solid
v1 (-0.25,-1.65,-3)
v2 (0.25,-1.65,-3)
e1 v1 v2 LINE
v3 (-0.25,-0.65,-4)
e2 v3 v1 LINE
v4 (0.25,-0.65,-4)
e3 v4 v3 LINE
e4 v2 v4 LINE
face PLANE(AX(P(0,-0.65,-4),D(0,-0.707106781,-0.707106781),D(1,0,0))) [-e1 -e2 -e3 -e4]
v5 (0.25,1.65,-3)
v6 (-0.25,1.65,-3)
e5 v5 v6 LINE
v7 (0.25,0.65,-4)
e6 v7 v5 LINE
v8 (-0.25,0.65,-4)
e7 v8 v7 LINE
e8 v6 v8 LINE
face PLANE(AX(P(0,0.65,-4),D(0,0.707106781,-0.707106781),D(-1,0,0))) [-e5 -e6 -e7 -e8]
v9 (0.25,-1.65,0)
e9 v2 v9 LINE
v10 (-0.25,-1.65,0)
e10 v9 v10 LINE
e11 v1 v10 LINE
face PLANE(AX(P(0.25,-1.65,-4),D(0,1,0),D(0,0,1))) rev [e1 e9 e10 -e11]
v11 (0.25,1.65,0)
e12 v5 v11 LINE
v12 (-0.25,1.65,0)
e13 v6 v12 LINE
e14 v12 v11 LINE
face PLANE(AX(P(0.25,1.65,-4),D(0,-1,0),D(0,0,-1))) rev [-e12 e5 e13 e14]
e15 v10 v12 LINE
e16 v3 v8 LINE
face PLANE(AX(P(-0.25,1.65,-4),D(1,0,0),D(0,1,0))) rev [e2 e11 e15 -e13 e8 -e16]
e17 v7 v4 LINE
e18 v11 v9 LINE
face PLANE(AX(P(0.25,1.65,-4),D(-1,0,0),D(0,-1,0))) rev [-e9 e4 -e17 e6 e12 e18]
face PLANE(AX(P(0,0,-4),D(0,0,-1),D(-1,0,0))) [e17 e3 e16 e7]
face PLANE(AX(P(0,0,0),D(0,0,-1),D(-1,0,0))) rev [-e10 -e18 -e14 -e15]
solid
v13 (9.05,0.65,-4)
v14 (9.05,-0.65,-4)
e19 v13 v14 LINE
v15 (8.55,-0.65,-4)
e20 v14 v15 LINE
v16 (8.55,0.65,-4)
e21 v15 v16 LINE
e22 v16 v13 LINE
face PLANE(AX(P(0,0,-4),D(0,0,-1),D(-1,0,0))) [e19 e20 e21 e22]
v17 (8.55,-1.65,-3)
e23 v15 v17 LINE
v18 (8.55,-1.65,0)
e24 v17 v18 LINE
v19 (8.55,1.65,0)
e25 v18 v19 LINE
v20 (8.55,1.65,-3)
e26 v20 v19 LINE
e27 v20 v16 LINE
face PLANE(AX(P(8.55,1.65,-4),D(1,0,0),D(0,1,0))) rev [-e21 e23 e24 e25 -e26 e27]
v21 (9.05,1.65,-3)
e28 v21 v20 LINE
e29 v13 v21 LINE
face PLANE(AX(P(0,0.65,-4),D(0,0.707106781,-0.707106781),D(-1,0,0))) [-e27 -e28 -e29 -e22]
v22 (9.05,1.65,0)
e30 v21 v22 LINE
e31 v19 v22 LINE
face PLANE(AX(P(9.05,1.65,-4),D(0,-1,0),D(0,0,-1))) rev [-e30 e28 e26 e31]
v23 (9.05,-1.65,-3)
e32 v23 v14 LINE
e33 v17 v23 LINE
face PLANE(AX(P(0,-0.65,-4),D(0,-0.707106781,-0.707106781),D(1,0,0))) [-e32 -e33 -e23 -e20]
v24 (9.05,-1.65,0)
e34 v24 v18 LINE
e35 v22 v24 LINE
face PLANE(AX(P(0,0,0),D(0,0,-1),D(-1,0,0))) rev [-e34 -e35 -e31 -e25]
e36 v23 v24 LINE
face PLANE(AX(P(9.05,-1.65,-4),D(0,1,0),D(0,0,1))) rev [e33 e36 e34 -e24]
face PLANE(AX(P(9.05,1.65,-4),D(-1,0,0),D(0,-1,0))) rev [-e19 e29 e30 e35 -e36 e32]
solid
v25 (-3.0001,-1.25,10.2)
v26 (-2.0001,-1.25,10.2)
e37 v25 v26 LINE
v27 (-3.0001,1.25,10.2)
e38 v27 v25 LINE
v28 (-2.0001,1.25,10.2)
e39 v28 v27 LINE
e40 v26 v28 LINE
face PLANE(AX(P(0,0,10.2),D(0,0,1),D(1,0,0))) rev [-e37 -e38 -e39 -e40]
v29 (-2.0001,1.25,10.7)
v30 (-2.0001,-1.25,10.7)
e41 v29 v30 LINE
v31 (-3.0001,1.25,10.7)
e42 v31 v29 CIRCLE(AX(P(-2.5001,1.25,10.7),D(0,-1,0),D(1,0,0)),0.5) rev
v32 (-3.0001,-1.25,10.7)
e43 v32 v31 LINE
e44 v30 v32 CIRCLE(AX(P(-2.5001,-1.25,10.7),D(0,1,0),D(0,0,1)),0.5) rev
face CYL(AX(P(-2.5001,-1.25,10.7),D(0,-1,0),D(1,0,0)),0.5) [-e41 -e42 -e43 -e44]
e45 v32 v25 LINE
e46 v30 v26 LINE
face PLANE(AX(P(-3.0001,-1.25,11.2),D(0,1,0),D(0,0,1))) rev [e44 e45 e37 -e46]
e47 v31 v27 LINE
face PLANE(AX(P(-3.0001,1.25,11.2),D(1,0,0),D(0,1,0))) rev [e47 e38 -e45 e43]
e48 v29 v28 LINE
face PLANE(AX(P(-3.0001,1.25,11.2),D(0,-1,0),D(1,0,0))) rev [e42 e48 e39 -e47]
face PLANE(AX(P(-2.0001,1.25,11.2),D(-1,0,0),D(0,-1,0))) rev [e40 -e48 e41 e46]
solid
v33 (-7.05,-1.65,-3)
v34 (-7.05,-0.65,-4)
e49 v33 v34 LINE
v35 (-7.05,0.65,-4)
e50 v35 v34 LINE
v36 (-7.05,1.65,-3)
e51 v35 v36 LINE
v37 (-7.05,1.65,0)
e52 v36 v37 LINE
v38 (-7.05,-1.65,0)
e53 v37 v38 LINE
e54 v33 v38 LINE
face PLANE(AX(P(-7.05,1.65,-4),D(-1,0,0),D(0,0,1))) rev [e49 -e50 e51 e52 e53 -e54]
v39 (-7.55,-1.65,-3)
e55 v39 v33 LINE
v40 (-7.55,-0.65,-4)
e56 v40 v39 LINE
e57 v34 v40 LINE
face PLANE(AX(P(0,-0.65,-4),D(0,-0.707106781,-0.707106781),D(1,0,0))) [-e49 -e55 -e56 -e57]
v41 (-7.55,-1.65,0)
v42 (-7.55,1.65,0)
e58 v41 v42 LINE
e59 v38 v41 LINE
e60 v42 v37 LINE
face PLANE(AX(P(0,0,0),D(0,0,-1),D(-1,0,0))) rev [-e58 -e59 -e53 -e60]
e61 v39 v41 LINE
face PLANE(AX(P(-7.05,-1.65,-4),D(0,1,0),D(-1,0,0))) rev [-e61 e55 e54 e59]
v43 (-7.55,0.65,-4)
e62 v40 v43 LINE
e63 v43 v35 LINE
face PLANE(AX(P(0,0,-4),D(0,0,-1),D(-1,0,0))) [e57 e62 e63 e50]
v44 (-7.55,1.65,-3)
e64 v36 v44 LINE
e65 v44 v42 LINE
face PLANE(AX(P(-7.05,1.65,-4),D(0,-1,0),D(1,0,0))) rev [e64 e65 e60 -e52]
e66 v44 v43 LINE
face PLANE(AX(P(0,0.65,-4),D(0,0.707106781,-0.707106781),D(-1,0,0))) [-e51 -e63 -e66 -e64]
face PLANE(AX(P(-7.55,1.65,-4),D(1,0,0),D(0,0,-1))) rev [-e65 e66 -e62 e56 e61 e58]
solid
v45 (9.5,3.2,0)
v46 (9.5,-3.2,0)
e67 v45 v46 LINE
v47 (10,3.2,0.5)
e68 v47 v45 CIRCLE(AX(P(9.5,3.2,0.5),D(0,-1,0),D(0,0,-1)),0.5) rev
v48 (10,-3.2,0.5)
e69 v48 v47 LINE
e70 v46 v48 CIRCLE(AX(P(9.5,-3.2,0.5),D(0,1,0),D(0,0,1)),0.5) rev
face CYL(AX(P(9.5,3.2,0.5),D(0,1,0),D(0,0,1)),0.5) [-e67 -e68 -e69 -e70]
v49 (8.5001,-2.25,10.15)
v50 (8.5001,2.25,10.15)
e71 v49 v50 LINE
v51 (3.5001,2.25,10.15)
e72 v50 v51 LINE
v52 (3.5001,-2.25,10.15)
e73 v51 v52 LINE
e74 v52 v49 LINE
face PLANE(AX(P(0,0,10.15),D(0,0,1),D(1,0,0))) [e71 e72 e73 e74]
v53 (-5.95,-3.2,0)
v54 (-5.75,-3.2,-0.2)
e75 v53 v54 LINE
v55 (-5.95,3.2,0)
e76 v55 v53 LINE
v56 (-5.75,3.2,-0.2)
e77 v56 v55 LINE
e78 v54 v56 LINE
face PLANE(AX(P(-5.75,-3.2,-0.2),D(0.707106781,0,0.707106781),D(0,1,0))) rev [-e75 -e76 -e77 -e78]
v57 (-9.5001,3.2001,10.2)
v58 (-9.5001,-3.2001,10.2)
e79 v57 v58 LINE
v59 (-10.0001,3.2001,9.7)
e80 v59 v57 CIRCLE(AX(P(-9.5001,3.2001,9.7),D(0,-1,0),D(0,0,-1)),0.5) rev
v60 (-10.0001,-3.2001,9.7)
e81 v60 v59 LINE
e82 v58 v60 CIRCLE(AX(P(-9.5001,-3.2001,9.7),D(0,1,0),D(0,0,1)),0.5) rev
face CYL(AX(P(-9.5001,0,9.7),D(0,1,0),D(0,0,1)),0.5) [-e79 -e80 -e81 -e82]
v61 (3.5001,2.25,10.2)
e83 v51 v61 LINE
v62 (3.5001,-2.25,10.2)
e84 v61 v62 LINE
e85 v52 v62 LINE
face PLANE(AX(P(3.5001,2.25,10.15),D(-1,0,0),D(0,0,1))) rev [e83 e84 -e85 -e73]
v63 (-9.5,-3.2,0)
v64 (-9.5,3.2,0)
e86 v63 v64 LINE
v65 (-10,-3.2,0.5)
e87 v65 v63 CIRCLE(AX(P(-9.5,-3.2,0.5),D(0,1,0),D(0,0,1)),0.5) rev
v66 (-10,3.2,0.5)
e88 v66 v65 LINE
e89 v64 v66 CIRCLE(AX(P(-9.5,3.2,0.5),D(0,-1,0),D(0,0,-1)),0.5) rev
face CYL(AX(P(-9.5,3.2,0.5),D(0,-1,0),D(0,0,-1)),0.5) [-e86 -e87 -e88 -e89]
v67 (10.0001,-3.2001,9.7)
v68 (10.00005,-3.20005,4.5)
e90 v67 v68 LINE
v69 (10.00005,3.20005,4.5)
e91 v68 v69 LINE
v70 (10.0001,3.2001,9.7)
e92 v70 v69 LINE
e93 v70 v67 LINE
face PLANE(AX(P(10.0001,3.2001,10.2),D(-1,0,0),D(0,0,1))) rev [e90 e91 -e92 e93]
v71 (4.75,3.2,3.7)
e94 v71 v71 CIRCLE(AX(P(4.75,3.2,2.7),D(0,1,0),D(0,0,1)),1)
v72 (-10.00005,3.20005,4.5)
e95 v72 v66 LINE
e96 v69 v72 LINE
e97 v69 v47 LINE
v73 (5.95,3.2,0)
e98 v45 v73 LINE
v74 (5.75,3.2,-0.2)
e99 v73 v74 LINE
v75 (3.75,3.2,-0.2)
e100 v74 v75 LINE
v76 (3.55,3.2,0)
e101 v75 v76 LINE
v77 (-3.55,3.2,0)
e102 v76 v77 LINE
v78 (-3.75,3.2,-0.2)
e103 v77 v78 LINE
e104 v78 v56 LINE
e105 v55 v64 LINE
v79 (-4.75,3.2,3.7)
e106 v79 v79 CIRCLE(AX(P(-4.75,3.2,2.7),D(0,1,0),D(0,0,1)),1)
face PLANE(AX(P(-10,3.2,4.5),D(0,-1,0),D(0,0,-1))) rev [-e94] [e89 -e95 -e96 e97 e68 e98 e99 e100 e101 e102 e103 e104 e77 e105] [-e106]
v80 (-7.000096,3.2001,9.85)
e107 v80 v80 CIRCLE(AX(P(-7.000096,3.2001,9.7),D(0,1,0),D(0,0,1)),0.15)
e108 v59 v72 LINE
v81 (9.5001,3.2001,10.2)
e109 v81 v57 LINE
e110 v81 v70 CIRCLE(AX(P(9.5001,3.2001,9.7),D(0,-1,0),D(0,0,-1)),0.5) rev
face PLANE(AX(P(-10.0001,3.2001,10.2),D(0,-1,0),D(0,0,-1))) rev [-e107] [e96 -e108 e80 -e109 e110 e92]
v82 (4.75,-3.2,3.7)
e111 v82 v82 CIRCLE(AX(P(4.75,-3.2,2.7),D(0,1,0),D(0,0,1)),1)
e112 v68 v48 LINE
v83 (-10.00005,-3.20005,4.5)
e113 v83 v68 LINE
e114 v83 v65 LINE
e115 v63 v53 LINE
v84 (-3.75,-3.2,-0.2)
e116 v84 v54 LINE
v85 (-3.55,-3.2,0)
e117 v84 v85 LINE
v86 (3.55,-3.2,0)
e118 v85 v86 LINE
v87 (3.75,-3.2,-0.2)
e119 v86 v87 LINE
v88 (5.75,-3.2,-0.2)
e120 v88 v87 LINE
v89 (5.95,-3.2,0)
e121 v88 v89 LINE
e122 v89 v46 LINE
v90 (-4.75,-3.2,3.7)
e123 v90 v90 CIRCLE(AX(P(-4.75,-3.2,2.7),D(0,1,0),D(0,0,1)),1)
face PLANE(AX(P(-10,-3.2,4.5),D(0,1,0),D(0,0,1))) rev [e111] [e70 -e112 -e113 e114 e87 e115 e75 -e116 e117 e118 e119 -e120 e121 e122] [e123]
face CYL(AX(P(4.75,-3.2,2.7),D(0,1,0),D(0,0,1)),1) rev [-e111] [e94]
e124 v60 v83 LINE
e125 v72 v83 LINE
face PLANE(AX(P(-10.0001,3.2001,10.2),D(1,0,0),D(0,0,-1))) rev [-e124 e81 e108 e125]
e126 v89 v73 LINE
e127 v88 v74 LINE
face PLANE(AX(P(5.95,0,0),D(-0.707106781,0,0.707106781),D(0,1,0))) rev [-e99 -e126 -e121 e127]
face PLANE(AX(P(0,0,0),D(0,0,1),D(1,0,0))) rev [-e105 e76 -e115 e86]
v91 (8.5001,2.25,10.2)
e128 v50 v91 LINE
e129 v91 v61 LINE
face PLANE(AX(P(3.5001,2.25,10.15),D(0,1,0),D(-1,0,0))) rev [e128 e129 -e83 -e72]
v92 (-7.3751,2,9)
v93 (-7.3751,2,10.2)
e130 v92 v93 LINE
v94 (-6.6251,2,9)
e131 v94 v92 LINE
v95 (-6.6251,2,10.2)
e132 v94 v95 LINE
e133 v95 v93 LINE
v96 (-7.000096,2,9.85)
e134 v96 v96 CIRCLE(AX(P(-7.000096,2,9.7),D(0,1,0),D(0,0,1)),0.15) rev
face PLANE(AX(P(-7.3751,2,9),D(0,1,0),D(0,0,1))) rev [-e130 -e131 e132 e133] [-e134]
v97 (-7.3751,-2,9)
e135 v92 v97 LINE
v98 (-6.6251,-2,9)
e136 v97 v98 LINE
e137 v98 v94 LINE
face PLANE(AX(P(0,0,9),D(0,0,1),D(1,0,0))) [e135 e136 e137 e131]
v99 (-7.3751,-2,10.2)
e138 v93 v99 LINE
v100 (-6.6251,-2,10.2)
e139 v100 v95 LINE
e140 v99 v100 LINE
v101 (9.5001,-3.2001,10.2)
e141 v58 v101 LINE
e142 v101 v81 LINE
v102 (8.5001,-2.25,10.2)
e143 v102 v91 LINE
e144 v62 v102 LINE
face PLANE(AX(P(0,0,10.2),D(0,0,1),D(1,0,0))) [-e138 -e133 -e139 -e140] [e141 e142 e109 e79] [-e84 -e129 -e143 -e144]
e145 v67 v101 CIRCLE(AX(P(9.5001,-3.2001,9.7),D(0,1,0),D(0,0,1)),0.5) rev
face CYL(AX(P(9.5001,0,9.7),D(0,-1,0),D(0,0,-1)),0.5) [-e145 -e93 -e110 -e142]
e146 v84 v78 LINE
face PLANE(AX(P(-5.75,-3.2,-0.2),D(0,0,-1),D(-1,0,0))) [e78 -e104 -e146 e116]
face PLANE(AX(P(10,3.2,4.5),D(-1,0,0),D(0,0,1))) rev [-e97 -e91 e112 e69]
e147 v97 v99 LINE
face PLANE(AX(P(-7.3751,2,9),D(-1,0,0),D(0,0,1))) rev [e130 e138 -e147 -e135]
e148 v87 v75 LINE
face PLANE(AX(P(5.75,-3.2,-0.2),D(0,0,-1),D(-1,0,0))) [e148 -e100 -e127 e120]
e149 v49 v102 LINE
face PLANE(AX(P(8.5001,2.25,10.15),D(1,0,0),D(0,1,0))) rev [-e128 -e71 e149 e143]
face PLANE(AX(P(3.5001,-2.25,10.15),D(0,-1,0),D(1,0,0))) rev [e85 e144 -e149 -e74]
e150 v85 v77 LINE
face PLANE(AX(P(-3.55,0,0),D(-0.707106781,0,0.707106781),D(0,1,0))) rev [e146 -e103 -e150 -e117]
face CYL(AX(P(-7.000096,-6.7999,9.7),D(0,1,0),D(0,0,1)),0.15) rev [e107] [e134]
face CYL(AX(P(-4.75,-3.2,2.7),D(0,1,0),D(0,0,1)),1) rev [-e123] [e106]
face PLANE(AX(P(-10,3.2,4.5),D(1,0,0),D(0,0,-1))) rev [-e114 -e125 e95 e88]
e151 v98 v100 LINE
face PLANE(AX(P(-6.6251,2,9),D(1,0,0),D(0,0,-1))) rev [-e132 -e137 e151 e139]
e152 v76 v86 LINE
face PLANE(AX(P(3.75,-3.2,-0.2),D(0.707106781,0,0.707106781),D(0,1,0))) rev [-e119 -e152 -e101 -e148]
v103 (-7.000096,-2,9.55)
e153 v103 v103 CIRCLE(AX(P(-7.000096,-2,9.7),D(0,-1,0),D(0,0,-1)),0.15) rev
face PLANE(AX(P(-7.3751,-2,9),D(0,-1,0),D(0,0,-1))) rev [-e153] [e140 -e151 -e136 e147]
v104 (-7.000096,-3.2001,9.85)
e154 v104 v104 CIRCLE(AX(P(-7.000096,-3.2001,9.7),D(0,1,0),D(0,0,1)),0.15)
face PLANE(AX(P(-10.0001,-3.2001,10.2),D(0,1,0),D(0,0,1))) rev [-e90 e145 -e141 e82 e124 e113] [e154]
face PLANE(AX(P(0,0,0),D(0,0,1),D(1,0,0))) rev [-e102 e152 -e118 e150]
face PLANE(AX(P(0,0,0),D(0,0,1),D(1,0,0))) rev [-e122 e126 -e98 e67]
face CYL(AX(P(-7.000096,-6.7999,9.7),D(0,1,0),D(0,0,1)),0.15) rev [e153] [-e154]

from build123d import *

# Parameters (mm, degrees)
BASE_SKETCH_W               = 20
BASE_SKETCH_H               = 6.4
BASE_EXTRUDE_DEPTH          = 4.5
CONTACTS_SKETCH_W           = 0.5
CONTACTS_SKETCH_H           = 3.3
CONTACTS_EXTRUDE_DEPTH      = 4
CONTACTS_EXTRUDE_2_DEPTH    = 4
CONTACTS_EXTRUDE_3_DEPTH    = 4
CONTACT_1_CHAMFER_SIZE      = 1
CHAMFER1_SIZE               = 1
CHAMFER2_SIZE               = 1
MOUNTING_HOLES_SKETCH_R     = 1
CUT_MOUNTING_HOLES_DEPTH    = 6.4
BOTTOM_PROTRUSIONS_SKETCH_W = 2
BOTTOM_PROTRUSIONS_SKETCH_H = 0.2
BOTTOM_PROTRUSIONS_DEPTH    = 6.4
CHAMFER_PROTRUSIONS_SIZE    = 0.2
TOP_SKETCH_W                = 20.0002
TOP_SKETCH_H                = 6.4002
TOP_EXTRUDE_DEPTH           = 5.7
BUTTON_SKETCH_W             = 1
BUTTON_SKETCH_H             = 2.5
BUTTON_EXTRUDE_DEPTH        = 1
BUTTON_FILLET_RADIUS        = 0.5
BUTTON_FILLET_LENGTH        = 2.5
TOP_INDENT_SKETCH_W         = 5
TOP_INDENT_SKETCH_H         = 4.5
TOP_INDENT_CUT_DEPTH        = 0.05
PIVOT_HOLE_SKETCH_R         = 0.15
LEVER_PIVOT_HOLE_CUT_DEPTH  = 10
LEVER_RECESS_SKETCH_W       = 0.75
LEVER_RECESS_SKETCH_H       = 4
LEVER_RECESS_CUT_DEPTH      = 1.2
CORNER_FILLET_R             = 0.5


with BuildPart() as part:
    # Base Sketch → Base Extrude (new body)
    with BuildSketch(Plane.XY):
        Rectangle(BASE_SKETCH_W, BASE_SKETCH_H)
    extrude(amount=BASE_EXTRUDE_DEPTH)

    # Mounting Holes Sketch → Cut Mounting Holes (cut)
    with BuildSketch(Plane(origin=(0, 3.2, 0), x_dir=(1, 0, 0), z_dir=(0, 1, 0))):
        with Locations(Location((-4.75, -2.7, 0), (0, 0, 270))):
            Circle(MOUNTING_HOLES_SKETCH_R)
        with Locations(Location((4.75, -2.7, 0), (0, 0, 270))):
            Circle(MOUNTING_HOLES_SKETCH_R)
    extrude(amount=-CUT_MOUNTING_HOLES_DEPTH, mode=Mode.SUBTRACT)

    # Bottom Protrusions Sketch → Bottom Protrusions (add)
    with BuildSketch(Plane(origin=(0, 3.2, 0), x_dir=(1, 0, 0), z_dir=(0, 1, 0))):
        with Locations((-4.75, 0.1)):
            Rectangle(BOTTOM_PROTRUSIONS_SKETCH_W, BOTTOM_PROTRUSIONS_SKETCH_H)
        with Locations((4.75, 0.1)):
            Rectangle(BOTTOM_PROTRUSIONS_SKETCH_W, BOTTOM_PROTRUSIONS_SKETCH_H)
    extrude(amount=-BOTTOM_PROTRUSIONS_DEPTH)

    # Chamfer Protrusions
    chamfer_protrusions_edges = [part.edges().sort_by_distance(p)[0] for p in [
        (5.75, 0, 0),
        (3.75, 0, 0),
        (-3.75, 0, 0),
        (-5.75, 0, 0),
    ]]
    chamfer(chamfer_protrusions_edges, length=CHAMFER_PROTRUSIONS_SIZE - 0.0001)  # a hair under: the kernel refuses the full size

    # Top Sketch → Top Extrude (add)
    with BuildSketch(Plane.XY.offset(4.5)):
        Rectangle(TOP_SKETCH_W, TOP_SKETCH_H)
    extrude(amount=TOP_EXTRUDE_DEPTH)

    # Top Indent Sketch → Top Indent Cut (cut)
    with BuildSketch(Plane.XY.offset(10.2)):
        with Locations((6.0001, 0)):
            Rectangle(TOP_INDENT_SKETCH_W, TOP_INDENT_SKETCH_H)
    extrude(amount=-TOP_INDENT_CUT_DEPTH, mode=Mode.SUBTRACT)

    # Pivot Hole Sketch → Lever Pivot Hole Cut (cut)
    with BuildSketch(Plane(origin=(0, 3.2001, 0), x_dir=(1, 0, 0), z_dir=(0, 1, 0))):
        with Locations(Location((-7.000095614, -9.7, 0), (0, 0, 270))):
            Circle(PIVOT_HOLE_SKETCH_R)
    extrude(amount=-LEVER_PIVOT_HOLE_CUT_DEPTH, mode=Mode.SUBTRACT)

    # Lever Recess Sketch → Lever Recess Cut (cut)
    with BuildSketch(Plane.XY.offset(10.2)):
        with Locations((-7.0001, 0)):
            Rectangle(LEVER_RECESS_SKETCH_W, LEVER_RECESS_SKETCH_H)
    extrude(amount=-LEVER_RECESS_CUT_DEPTH, mode=Mode.SUBTRACT)

    # Corner Fillet
    corner_fillet_edges = [part.edges().sort_by_distance(p)[0] for p in [
        (10.0001, 0, 10.2),
        (-10.0001, 0, 10.2),
        (-10, 0, 0),
        (10, 0, 0),
    ]]
    fillet(corner_fillet_edges, radius=CORNER_FILLET_R)


with BuildPart() as body_2:
    # Contacts Sketch → Contacts Extrude (new body)
    with BuildSketch(Plane(origin=(0, 0, 0), x_dir=(-1, 0, 0), z_dir=(0, 0, -1))):
        Rectangle(CONTACTS_SKETCH_W, CONTACTS_SKETCH_H)
    extrude(amount=CONTACTS_EXTRUDE_DEPTH)

    # Chamfer1
    chamfer1_edges = [body_2.edges().sort_by_distance(p)[0] for p in [
        (0, -1.65, -4),
        (0, 1.65, -4),
    ]]
    chamfer(chamfer1_edges, length=CHAMFER1_SIZE)


with BuildPart() as body_3:
    # Contacts Sketch → Contacts Extrude 2 (new body)
    with BuildSketch(Plane(origin=(0, 0, 0), x_dir=(-1, 0, 0), z_dir=(0, 0, -1))):
        with Locations((-8.8, 0)):
            Rectangle(CONTACTS_SKETCH_W, CONTACTS_SKETCH_H)
    extrude(amount=CONTACTS_EXTRUDE_2_DEPTH)

    # Chamfer2
    chamfer2_edges = [body_3.edges().sort_by_distance(p)[0] for p in [
        (8.8, -1.65, -4),
        (8.8, 1.65, -4),
    ]]
    chamfer(chamfer2_edges, length=CHAMFER2_SIZE)


with BuildPart() as body_4:
    # Contacts Sketch → Contacts Extrude 3 (new body)
    with BuildSketch(Plane(origin=(0, 0, 0), x_dir=(-1, 0, 0), z_dir=(0, 0, -1))):
        with Locations((7.3, 0)):
            Rectangle(CONTACTS_SKETCH_W, CONTACTS_SKETCH_H)
    extrude(amount=CONTACTS_EXTRUDE_3_DEPTH)

    # Contact 1 Chamfer
    contact_1_chamfer_edges = [body_4.edges().sort_by_distance(p)[0] for p in [
        (-7.3, -1.65, -4),
        (-7.3, 1.65, -4),
    ]]
    chamfer(contact_1_chamfer_edges, length=CONTACT_1_CHAMFER_SIZE)


with BuildPart() as body_5:
    # Button Sketch → Button Extrude (new body)
    with BuildSketch(Plane.XY.offset(10.2)):
        with Locations((-2.5001, 0)):
            Rectangle(BUTTON_SKETCH_W, BUTTON_SKETCH_H)
    extrude(amount=BUTTON_EXTRUDE_DEPTH)

    # Button Fillet: full round fillet: the end face becomes a half cylinder, R = half its width
    button_fillet_face = Plane((-2.5001, 0, 11.2), x_dir=(0, 1, 0), z_dir=(0, 0, 1))  # on the end face: x along it, z out of the body
    button_fillet_slab = button_fillet_face.offset(-BUTTON_FILLET_RADIUS / 2) * Box(BUTTON_FILLET_LENGTH, 2 * BUTTON_FILLET_RADIUS, BUTTON_FILLET_RADIUS, mode=Mode.PRIVATE)  # the body's end, R deep
    button_fillet_round = Plane((-2.5001, 0, 10.7), x_dir=(0, 0, 1), z_dir=(0, 1, 0)) * Cylinder(BUTTON_FILLET_RADIUS, BUTTON_FILLET_LENGTH, mode=Mode.PRIVATE)  # its axis R under the face
    add(button_fillet_slab - button_fillet_round, mode=Mode.SUBTRACT)


solid = Compound([part.part, body_2.part, body_3.part, body_4.part, body_5.part])
